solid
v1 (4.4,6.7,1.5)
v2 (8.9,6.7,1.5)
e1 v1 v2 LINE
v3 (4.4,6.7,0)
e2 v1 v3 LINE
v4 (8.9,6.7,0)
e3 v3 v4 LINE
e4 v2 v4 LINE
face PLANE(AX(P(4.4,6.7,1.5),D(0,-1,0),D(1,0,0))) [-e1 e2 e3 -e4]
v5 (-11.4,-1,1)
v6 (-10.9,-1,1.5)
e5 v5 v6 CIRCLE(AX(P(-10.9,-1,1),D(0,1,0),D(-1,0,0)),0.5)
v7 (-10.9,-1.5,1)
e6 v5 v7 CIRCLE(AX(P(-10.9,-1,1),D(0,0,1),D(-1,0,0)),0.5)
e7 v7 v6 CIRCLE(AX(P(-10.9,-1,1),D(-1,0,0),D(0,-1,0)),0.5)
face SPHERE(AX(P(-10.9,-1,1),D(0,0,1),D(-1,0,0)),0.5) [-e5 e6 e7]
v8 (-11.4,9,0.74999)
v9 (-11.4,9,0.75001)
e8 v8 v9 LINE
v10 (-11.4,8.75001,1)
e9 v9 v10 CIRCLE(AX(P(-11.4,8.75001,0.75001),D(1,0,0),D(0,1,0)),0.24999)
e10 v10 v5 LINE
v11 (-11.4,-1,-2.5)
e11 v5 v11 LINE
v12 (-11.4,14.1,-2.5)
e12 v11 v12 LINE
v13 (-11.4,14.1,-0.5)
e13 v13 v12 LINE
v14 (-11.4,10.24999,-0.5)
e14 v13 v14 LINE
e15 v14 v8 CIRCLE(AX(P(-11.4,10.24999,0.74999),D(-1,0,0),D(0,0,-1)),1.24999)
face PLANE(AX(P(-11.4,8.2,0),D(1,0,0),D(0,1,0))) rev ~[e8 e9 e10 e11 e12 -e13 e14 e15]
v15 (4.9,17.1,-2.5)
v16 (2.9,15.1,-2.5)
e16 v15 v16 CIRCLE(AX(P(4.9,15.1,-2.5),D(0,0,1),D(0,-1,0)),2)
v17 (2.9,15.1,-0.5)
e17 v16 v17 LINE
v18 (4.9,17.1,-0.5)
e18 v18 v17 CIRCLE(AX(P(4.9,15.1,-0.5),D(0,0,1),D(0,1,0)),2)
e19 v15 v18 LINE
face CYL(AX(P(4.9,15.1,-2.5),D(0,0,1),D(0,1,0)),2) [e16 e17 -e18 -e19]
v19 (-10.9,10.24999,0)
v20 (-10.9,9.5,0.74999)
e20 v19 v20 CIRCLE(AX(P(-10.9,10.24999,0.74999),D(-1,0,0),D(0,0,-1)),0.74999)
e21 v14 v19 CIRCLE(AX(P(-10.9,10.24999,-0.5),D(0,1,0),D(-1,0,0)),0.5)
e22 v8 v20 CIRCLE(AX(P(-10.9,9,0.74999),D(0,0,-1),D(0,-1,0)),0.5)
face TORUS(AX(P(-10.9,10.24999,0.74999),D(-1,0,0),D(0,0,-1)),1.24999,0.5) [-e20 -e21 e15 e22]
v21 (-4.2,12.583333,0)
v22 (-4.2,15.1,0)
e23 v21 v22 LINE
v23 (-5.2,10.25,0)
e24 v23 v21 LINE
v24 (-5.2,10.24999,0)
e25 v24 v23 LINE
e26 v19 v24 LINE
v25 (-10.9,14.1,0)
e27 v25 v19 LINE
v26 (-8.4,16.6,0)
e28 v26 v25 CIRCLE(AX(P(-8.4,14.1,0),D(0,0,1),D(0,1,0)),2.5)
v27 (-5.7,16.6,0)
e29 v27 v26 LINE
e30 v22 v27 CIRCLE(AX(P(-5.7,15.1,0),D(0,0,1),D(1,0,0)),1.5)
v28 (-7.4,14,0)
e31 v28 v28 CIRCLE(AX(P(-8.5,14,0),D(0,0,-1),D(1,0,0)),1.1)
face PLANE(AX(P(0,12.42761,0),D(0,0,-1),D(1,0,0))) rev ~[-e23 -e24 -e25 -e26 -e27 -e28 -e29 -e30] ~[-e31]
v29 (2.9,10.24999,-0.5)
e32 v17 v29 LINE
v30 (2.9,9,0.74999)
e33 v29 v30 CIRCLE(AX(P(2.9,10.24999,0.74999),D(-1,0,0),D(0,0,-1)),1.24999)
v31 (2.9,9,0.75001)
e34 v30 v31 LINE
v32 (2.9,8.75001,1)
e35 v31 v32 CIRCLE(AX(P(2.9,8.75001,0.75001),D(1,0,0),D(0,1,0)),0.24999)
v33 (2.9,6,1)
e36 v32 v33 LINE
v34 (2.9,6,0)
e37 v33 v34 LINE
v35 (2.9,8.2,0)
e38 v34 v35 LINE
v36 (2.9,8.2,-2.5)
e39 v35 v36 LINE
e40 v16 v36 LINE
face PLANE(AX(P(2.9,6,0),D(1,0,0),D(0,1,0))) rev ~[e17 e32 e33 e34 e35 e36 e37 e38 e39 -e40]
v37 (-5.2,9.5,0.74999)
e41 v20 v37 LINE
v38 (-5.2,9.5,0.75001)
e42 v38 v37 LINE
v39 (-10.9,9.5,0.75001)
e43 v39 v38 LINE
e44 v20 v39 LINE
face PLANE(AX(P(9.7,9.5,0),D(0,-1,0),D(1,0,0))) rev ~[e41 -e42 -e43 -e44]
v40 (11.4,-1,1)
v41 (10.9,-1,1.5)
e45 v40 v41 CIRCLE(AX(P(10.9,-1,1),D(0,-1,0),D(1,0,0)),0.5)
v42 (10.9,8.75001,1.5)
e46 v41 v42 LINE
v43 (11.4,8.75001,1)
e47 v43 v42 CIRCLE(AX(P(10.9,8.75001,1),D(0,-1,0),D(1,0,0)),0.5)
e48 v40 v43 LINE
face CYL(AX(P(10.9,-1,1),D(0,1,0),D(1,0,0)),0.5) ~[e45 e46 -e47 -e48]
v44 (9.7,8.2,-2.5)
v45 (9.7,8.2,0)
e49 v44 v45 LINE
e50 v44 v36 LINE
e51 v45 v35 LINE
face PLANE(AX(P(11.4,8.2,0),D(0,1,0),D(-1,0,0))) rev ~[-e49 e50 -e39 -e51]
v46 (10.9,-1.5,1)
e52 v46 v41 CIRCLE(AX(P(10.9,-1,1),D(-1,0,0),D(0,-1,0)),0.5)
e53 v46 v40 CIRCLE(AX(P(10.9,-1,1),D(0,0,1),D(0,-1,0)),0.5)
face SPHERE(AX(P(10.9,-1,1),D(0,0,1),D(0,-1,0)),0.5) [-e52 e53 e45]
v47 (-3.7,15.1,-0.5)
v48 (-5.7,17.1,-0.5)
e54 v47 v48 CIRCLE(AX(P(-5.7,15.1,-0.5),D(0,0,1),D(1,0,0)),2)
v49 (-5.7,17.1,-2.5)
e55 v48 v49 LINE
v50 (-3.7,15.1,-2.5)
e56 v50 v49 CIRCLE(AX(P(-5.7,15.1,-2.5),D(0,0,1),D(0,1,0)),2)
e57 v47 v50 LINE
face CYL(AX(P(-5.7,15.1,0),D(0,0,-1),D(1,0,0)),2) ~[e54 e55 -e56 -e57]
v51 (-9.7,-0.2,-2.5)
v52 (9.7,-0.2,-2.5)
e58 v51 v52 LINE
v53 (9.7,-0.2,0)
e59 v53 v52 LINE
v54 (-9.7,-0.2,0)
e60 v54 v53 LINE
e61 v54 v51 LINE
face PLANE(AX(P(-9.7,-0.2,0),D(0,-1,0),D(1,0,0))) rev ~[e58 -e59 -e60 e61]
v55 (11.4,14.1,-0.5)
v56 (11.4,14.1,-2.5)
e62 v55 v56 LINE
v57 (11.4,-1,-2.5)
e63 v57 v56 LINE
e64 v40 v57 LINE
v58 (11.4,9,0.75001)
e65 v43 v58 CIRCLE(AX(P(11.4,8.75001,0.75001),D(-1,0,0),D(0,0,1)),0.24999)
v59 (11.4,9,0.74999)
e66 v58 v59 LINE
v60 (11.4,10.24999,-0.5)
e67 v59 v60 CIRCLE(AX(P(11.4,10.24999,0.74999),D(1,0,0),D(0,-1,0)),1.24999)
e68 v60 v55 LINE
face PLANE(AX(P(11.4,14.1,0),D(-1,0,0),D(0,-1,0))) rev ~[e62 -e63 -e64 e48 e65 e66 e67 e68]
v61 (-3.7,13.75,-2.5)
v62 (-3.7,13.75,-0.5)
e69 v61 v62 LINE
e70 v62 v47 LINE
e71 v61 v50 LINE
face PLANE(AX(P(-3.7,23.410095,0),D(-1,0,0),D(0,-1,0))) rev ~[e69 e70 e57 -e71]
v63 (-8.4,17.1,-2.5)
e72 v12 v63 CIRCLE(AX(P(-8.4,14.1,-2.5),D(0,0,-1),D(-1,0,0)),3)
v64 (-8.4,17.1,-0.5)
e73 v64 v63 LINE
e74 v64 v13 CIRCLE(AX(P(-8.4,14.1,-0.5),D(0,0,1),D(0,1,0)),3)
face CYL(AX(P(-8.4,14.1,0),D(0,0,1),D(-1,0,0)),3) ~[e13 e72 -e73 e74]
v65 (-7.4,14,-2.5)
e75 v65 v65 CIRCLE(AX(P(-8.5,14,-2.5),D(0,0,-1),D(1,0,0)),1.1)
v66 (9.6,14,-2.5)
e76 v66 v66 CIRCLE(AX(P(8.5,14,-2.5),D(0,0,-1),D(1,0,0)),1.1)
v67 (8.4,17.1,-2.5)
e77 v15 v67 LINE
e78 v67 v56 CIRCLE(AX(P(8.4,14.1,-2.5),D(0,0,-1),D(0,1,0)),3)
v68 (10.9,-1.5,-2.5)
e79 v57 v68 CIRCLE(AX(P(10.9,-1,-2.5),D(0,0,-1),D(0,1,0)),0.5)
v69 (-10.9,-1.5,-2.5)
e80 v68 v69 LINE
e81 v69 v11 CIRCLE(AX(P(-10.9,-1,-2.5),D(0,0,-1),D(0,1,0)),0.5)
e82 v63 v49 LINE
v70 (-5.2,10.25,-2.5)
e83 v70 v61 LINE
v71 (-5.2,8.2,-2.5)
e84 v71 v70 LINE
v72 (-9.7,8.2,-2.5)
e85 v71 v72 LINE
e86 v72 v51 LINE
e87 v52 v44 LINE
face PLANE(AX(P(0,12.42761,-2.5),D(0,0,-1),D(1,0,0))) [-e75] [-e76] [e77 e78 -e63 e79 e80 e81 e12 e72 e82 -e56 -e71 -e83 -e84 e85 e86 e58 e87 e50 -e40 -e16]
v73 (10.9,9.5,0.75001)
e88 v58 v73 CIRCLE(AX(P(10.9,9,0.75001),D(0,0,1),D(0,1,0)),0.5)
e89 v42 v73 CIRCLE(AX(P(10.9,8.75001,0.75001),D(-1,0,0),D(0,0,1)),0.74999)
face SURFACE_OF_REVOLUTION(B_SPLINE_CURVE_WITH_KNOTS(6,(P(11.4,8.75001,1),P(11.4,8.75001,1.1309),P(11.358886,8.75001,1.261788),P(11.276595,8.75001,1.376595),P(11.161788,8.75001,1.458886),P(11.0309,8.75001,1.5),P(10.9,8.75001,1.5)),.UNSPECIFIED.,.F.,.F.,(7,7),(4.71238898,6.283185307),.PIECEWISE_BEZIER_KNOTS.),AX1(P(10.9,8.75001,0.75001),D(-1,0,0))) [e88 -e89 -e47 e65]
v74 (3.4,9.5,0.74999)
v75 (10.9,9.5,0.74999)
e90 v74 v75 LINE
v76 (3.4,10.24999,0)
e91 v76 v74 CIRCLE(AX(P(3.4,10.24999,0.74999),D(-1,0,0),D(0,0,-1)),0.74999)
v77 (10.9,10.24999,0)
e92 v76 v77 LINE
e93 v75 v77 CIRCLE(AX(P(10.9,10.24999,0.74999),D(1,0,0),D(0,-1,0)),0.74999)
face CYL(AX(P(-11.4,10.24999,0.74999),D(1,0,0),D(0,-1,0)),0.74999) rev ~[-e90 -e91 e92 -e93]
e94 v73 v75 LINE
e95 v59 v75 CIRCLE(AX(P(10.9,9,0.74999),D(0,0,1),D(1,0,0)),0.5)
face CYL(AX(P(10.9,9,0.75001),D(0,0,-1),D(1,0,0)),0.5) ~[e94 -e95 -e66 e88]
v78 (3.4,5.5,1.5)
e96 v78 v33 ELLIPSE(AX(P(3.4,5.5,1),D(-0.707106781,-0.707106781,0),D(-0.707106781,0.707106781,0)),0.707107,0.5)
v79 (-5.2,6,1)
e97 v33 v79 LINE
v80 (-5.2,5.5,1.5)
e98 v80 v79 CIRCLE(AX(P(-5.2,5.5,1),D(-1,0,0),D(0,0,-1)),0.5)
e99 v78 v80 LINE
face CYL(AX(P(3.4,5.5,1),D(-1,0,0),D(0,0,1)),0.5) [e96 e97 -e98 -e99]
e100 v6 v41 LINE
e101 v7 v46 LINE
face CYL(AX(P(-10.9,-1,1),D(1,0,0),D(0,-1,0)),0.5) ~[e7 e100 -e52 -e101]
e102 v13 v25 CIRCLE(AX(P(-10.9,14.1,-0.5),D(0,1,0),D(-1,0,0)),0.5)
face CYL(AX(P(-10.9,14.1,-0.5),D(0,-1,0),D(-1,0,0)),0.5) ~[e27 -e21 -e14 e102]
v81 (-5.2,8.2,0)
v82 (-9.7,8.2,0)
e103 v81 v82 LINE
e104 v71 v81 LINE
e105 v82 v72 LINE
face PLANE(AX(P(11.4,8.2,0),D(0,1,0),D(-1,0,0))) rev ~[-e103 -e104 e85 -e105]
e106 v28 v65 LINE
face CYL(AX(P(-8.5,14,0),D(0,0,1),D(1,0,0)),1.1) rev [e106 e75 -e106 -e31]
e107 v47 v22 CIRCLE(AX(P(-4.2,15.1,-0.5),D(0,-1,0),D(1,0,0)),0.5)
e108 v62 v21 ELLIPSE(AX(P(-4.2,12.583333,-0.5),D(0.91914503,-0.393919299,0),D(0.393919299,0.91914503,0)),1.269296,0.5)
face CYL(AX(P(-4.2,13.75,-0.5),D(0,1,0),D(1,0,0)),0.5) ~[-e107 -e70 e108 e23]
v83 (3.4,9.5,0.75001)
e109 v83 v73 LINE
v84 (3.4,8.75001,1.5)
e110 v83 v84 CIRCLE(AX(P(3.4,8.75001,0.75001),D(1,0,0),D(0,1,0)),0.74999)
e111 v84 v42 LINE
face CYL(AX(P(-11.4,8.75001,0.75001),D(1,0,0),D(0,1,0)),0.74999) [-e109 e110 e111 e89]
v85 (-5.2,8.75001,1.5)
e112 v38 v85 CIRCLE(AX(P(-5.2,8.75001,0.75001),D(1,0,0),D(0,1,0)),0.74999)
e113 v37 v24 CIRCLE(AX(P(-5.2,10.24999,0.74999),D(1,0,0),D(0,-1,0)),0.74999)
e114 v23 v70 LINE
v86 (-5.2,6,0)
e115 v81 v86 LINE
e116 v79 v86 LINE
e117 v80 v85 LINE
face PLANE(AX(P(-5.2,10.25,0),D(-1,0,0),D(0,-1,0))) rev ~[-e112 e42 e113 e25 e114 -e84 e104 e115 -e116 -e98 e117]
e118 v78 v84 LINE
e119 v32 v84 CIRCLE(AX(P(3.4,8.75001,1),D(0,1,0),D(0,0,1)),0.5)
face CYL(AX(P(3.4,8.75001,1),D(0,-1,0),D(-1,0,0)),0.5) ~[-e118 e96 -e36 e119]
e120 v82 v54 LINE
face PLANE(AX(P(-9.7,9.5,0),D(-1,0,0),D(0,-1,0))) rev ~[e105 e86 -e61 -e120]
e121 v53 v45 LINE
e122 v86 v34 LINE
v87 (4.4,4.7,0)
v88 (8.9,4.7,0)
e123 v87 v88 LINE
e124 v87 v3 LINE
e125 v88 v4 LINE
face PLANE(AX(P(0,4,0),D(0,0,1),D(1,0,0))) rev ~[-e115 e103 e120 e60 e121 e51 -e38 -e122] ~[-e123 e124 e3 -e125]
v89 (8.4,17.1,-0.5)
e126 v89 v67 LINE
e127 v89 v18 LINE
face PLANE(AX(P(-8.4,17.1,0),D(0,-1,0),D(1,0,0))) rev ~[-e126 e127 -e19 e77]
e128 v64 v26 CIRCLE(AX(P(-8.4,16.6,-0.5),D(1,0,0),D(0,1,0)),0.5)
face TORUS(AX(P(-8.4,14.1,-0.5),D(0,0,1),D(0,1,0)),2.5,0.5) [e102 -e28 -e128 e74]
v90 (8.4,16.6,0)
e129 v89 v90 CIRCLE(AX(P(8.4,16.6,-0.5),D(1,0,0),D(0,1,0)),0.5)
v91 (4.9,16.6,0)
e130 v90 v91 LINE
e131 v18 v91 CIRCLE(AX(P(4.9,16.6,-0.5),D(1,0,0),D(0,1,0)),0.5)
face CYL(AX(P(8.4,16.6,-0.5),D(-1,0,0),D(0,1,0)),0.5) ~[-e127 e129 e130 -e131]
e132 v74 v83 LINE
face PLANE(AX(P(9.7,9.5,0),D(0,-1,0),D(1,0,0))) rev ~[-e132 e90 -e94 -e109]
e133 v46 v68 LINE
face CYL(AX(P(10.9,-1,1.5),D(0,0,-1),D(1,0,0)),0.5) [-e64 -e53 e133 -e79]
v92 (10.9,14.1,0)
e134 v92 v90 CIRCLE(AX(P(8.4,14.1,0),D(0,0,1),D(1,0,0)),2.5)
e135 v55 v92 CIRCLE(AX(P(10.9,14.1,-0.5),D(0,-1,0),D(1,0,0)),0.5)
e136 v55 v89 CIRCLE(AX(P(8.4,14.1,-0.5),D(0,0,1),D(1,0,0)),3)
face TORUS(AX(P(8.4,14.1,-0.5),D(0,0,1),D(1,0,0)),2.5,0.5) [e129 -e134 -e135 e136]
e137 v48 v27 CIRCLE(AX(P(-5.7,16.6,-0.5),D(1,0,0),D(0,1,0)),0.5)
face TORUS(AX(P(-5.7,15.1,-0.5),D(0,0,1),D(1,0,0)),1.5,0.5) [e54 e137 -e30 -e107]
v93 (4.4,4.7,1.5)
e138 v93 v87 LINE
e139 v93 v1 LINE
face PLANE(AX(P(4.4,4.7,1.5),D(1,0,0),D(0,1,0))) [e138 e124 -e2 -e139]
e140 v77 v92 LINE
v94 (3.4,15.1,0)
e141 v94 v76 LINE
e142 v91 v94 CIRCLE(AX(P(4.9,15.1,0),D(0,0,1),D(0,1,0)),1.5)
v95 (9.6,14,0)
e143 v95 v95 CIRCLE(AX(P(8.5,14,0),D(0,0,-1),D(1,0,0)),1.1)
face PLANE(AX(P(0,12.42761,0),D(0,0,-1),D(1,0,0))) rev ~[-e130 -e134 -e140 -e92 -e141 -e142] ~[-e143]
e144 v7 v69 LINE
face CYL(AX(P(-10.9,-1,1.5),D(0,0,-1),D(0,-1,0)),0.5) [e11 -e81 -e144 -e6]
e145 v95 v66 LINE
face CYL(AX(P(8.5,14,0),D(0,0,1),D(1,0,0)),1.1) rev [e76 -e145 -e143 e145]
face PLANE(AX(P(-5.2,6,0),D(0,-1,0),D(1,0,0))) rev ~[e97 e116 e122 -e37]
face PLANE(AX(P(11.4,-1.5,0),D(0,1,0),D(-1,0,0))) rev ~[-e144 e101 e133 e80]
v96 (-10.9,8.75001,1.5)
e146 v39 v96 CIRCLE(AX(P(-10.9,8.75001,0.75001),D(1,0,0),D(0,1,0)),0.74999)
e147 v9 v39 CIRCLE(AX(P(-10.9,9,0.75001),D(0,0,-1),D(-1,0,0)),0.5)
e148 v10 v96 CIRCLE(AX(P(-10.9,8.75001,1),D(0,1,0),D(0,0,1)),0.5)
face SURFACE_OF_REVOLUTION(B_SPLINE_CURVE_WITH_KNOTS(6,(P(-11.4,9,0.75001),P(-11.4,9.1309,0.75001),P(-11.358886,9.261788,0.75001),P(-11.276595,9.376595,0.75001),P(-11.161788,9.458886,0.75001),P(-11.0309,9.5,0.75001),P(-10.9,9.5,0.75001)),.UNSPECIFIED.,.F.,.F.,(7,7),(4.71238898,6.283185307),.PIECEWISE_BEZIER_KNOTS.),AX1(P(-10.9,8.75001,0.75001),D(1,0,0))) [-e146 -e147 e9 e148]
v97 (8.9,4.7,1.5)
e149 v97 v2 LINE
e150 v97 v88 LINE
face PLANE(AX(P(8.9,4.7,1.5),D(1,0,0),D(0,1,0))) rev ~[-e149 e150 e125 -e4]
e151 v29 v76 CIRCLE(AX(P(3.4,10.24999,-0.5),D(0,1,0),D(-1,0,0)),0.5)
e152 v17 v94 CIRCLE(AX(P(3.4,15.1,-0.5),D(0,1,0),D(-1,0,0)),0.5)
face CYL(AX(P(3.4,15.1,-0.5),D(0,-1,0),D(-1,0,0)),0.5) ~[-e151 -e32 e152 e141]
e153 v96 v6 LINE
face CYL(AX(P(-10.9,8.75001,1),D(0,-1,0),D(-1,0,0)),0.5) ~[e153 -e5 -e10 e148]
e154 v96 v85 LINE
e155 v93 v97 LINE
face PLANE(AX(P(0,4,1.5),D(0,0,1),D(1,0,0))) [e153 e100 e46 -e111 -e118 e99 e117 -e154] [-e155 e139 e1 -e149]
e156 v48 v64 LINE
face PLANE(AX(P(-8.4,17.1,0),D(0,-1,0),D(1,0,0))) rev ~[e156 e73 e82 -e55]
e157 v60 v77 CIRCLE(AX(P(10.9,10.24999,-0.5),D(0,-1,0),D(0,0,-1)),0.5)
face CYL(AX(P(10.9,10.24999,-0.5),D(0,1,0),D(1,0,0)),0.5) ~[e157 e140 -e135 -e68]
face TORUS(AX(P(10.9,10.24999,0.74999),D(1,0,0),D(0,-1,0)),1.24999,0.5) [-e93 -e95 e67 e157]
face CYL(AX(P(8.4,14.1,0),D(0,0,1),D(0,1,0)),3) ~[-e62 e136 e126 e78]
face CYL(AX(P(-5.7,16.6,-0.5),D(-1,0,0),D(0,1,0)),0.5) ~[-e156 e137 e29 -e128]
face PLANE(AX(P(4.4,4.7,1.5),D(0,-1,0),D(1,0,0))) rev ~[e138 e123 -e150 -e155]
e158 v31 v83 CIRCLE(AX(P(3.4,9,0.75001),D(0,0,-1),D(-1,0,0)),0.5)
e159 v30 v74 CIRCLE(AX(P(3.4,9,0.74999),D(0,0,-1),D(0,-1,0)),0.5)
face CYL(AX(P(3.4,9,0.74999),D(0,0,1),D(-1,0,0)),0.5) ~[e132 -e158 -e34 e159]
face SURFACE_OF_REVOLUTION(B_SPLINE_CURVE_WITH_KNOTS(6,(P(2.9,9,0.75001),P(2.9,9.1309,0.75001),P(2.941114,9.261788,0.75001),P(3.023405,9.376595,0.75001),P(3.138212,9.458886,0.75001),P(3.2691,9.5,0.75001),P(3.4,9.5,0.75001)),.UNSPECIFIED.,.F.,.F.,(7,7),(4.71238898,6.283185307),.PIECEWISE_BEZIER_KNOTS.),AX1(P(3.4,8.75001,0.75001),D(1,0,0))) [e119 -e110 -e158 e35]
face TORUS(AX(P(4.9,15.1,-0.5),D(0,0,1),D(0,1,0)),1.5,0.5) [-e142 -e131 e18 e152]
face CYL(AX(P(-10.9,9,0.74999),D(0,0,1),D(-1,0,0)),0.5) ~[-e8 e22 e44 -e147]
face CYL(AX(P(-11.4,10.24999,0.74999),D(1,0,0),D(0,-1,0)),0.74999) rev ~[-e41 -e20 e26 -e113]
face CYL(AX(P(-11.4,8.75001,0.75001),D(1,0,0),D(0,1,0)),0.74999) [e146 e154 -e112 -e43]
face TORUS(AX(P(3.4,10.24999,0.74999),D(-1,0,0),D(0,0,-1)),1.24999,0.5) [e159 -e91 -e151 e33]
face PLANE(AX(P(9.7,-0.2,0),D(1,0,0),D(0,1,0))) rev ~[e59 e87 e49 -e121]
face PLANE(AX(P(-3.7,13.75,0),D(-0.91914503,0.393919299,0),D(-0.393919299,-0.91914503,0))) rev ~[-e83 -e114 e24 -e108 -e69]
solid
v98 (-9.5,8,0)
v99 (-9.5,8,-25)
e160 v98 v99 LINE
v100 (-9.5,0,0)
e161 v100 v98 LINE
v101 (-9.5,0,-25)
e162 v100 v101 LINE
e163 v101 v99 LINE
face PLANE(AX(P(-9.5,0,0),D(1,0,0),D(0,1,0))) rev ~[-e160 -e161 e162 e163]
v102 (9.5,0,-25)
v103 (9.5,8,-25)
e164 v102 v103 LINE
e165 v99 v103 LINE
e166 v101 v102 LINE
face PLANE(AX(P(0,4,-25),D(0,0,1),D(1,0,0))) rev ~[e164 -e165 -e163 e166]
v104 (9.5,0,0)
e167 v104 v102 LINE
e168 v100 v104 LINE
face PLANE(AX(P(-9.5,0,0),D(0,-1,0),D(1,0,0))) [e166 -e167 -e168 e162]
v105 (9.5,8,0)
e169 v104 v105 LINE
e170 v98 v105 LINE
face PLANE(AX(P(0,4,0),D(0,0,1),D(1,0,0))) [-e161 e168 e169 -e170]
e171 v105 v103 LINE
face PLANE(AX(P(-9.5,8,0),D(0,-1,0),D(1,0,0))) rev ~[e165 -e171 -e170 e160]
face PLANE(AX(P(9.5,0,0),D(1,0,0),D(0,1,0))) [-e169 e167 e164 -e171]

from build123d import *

# Parameters (mm, degrees)
F0_W      = 19
F0_H      = 8
F1_DEPTH  = 25
F2_W      = 22.8
F2_H      = 11
F3_DEPTH  = 1.5
F5_DEPTH  = 2.5
F6_R      = 1.1
F7_DEPTH  = 2.5
F8_R      = 0.74999
F10_DEPTH = 12.5
F11_R     = 2
F12_W     = 4.5
F12_H     = 2
F13_DEPTH = 25
F14_R     = 0.5
F15_R     = 0.5
F16_R     = 0.5


# Not quite as in the source:
# - a fillet or chamfer is up to 0.001 mm smaller than in the source, because OpenCascade refuses the exact size


with BuildPart() as f1:
    # F0 (on Top) → F1 (new body)
    with BuildSketch(Plane.XY):
        with Locations((0, 4)):
            Rectangle(F0_W, F0_H)
    extrude(amount=-F1_DEPTH)


with BuildPart() as f3:
    # F2 (on Top) → F3 (new body)
    with BuildSketch(Plane.XY):
        with Locations((0, 4)):
            Rectangle(F2_W, F2_H)
    extrude(amount=F3_DEPTH)

    # F4 (on face) → F5 (join)
    with BuildSketch(Plane(origin=(0, 0, 0), x_dir=(1, 0, 0), z_dir=(0, 0, -1))):
        Polygon((9.7, -9.5), (11.4, -9.5), (11.4, 1.5), (-11.4, 1.5), (-11.4, -9.5), (-9.7, -9.5), (-9.7, 0.2), (9.7, 0.2), align=None)
    extrude(amount=F5_DEPTH)

    # F6 (on face) → F7 (join)
    with BuildSketch(Plane(origin=(0, 0, 0), x_dir=(1, 0, 0), z_dir=(0, 0, -1))):
        with BuildLine():
            Line((11.4, -14.1), (11.4, -8.2))
            Line((11.4, -8.2), (-11.4, -8.2))
            Line((-11.4, -8.2), (-11.4, -14.1))
            ThreePointArc((-11.4, -14.1), (-10.5213203436, -16.2213203436), (-8.4, -17.1))
            Line((-8.4, -17.1), (8.4, -17.1))
            ThreePointArc((8.4, -17.1), (10.5213203436, -16.2213203436), (11.4, -14.1))
        make_face()
        with Locations((-8.5, -14)):
            Circle(F6_R, mode=Mode.SUBTRACT)
        with Locations((8.5, -14)):
            Circle(F6_R, mode=Mode.SUBTRACT)
    extrude(amount=F7_DEPTH)

    # F8 (radius 0.75 in the source; OpenCascade refuses exactly that, so slightly less here)
    f8_edges = [f3.edges().sort_by_distance(p)[0] for p in [
        (0, 9.5, 0),
        (0, 9.5, 1.5),
    ]]
    fillet(f8_edges, radius=F8_R)

    # F9 (on Top) → F10 (cut, symmetric)
    with BuildSketch(Plane.XY):
        Polygon((2.9, 6), (2.9, 23.4100954436), (-3.7, 23.4100954436), (-3.7, 13.75), (-5.2, 10.25), (-5.2, 6), align=None)
    extrude(amount=F10_DEPTH, both=True, mode=Mode.SUBTRACT)

    # F11
    f11_edges = [f3.edges().sort_by_distance(p)[0] for p in [
        (-3.7, 17.1, -1.25),
        (2.9, 17.1, -1.25),
    ]]
    fillet(f11_edges, radius=F11_R)

    # F12 (on face) → F13 (cut)
    with BuildSketch(Plane.XY.offset(1.5)):
        with Locations((6.65, 5.7)):
            Rectangle(F12_W, F12_H)
    extrude(amount=-F13_DEPTH, mode=Mode.SUBTRACT)

    # F14
    f14_edges = [f3.edges().sort_by_distance(p)[0] for p in [
        (11.4, -1.5, -0.5),
        (-11.4, -1.5, -0.5),
    ]]
    fillet(f14_edges, radius=F14_R)

    # F15
    f15_edges = [f3.edges().sort_by_distance(p)[0] for p in [
        (11.4, 3.875005, 1.5),
    ]]
    fillet(f15_edges, radius=F15_R)

    # F16
    f16_edges = [f3.edges().sort_by_distance(p)[0] for p in [
        (-1.15, 6, 1.5),
    ]]
    fillet(f16_edges, radius=F16_R)


solid = Compound([f1.part, f3.part])
